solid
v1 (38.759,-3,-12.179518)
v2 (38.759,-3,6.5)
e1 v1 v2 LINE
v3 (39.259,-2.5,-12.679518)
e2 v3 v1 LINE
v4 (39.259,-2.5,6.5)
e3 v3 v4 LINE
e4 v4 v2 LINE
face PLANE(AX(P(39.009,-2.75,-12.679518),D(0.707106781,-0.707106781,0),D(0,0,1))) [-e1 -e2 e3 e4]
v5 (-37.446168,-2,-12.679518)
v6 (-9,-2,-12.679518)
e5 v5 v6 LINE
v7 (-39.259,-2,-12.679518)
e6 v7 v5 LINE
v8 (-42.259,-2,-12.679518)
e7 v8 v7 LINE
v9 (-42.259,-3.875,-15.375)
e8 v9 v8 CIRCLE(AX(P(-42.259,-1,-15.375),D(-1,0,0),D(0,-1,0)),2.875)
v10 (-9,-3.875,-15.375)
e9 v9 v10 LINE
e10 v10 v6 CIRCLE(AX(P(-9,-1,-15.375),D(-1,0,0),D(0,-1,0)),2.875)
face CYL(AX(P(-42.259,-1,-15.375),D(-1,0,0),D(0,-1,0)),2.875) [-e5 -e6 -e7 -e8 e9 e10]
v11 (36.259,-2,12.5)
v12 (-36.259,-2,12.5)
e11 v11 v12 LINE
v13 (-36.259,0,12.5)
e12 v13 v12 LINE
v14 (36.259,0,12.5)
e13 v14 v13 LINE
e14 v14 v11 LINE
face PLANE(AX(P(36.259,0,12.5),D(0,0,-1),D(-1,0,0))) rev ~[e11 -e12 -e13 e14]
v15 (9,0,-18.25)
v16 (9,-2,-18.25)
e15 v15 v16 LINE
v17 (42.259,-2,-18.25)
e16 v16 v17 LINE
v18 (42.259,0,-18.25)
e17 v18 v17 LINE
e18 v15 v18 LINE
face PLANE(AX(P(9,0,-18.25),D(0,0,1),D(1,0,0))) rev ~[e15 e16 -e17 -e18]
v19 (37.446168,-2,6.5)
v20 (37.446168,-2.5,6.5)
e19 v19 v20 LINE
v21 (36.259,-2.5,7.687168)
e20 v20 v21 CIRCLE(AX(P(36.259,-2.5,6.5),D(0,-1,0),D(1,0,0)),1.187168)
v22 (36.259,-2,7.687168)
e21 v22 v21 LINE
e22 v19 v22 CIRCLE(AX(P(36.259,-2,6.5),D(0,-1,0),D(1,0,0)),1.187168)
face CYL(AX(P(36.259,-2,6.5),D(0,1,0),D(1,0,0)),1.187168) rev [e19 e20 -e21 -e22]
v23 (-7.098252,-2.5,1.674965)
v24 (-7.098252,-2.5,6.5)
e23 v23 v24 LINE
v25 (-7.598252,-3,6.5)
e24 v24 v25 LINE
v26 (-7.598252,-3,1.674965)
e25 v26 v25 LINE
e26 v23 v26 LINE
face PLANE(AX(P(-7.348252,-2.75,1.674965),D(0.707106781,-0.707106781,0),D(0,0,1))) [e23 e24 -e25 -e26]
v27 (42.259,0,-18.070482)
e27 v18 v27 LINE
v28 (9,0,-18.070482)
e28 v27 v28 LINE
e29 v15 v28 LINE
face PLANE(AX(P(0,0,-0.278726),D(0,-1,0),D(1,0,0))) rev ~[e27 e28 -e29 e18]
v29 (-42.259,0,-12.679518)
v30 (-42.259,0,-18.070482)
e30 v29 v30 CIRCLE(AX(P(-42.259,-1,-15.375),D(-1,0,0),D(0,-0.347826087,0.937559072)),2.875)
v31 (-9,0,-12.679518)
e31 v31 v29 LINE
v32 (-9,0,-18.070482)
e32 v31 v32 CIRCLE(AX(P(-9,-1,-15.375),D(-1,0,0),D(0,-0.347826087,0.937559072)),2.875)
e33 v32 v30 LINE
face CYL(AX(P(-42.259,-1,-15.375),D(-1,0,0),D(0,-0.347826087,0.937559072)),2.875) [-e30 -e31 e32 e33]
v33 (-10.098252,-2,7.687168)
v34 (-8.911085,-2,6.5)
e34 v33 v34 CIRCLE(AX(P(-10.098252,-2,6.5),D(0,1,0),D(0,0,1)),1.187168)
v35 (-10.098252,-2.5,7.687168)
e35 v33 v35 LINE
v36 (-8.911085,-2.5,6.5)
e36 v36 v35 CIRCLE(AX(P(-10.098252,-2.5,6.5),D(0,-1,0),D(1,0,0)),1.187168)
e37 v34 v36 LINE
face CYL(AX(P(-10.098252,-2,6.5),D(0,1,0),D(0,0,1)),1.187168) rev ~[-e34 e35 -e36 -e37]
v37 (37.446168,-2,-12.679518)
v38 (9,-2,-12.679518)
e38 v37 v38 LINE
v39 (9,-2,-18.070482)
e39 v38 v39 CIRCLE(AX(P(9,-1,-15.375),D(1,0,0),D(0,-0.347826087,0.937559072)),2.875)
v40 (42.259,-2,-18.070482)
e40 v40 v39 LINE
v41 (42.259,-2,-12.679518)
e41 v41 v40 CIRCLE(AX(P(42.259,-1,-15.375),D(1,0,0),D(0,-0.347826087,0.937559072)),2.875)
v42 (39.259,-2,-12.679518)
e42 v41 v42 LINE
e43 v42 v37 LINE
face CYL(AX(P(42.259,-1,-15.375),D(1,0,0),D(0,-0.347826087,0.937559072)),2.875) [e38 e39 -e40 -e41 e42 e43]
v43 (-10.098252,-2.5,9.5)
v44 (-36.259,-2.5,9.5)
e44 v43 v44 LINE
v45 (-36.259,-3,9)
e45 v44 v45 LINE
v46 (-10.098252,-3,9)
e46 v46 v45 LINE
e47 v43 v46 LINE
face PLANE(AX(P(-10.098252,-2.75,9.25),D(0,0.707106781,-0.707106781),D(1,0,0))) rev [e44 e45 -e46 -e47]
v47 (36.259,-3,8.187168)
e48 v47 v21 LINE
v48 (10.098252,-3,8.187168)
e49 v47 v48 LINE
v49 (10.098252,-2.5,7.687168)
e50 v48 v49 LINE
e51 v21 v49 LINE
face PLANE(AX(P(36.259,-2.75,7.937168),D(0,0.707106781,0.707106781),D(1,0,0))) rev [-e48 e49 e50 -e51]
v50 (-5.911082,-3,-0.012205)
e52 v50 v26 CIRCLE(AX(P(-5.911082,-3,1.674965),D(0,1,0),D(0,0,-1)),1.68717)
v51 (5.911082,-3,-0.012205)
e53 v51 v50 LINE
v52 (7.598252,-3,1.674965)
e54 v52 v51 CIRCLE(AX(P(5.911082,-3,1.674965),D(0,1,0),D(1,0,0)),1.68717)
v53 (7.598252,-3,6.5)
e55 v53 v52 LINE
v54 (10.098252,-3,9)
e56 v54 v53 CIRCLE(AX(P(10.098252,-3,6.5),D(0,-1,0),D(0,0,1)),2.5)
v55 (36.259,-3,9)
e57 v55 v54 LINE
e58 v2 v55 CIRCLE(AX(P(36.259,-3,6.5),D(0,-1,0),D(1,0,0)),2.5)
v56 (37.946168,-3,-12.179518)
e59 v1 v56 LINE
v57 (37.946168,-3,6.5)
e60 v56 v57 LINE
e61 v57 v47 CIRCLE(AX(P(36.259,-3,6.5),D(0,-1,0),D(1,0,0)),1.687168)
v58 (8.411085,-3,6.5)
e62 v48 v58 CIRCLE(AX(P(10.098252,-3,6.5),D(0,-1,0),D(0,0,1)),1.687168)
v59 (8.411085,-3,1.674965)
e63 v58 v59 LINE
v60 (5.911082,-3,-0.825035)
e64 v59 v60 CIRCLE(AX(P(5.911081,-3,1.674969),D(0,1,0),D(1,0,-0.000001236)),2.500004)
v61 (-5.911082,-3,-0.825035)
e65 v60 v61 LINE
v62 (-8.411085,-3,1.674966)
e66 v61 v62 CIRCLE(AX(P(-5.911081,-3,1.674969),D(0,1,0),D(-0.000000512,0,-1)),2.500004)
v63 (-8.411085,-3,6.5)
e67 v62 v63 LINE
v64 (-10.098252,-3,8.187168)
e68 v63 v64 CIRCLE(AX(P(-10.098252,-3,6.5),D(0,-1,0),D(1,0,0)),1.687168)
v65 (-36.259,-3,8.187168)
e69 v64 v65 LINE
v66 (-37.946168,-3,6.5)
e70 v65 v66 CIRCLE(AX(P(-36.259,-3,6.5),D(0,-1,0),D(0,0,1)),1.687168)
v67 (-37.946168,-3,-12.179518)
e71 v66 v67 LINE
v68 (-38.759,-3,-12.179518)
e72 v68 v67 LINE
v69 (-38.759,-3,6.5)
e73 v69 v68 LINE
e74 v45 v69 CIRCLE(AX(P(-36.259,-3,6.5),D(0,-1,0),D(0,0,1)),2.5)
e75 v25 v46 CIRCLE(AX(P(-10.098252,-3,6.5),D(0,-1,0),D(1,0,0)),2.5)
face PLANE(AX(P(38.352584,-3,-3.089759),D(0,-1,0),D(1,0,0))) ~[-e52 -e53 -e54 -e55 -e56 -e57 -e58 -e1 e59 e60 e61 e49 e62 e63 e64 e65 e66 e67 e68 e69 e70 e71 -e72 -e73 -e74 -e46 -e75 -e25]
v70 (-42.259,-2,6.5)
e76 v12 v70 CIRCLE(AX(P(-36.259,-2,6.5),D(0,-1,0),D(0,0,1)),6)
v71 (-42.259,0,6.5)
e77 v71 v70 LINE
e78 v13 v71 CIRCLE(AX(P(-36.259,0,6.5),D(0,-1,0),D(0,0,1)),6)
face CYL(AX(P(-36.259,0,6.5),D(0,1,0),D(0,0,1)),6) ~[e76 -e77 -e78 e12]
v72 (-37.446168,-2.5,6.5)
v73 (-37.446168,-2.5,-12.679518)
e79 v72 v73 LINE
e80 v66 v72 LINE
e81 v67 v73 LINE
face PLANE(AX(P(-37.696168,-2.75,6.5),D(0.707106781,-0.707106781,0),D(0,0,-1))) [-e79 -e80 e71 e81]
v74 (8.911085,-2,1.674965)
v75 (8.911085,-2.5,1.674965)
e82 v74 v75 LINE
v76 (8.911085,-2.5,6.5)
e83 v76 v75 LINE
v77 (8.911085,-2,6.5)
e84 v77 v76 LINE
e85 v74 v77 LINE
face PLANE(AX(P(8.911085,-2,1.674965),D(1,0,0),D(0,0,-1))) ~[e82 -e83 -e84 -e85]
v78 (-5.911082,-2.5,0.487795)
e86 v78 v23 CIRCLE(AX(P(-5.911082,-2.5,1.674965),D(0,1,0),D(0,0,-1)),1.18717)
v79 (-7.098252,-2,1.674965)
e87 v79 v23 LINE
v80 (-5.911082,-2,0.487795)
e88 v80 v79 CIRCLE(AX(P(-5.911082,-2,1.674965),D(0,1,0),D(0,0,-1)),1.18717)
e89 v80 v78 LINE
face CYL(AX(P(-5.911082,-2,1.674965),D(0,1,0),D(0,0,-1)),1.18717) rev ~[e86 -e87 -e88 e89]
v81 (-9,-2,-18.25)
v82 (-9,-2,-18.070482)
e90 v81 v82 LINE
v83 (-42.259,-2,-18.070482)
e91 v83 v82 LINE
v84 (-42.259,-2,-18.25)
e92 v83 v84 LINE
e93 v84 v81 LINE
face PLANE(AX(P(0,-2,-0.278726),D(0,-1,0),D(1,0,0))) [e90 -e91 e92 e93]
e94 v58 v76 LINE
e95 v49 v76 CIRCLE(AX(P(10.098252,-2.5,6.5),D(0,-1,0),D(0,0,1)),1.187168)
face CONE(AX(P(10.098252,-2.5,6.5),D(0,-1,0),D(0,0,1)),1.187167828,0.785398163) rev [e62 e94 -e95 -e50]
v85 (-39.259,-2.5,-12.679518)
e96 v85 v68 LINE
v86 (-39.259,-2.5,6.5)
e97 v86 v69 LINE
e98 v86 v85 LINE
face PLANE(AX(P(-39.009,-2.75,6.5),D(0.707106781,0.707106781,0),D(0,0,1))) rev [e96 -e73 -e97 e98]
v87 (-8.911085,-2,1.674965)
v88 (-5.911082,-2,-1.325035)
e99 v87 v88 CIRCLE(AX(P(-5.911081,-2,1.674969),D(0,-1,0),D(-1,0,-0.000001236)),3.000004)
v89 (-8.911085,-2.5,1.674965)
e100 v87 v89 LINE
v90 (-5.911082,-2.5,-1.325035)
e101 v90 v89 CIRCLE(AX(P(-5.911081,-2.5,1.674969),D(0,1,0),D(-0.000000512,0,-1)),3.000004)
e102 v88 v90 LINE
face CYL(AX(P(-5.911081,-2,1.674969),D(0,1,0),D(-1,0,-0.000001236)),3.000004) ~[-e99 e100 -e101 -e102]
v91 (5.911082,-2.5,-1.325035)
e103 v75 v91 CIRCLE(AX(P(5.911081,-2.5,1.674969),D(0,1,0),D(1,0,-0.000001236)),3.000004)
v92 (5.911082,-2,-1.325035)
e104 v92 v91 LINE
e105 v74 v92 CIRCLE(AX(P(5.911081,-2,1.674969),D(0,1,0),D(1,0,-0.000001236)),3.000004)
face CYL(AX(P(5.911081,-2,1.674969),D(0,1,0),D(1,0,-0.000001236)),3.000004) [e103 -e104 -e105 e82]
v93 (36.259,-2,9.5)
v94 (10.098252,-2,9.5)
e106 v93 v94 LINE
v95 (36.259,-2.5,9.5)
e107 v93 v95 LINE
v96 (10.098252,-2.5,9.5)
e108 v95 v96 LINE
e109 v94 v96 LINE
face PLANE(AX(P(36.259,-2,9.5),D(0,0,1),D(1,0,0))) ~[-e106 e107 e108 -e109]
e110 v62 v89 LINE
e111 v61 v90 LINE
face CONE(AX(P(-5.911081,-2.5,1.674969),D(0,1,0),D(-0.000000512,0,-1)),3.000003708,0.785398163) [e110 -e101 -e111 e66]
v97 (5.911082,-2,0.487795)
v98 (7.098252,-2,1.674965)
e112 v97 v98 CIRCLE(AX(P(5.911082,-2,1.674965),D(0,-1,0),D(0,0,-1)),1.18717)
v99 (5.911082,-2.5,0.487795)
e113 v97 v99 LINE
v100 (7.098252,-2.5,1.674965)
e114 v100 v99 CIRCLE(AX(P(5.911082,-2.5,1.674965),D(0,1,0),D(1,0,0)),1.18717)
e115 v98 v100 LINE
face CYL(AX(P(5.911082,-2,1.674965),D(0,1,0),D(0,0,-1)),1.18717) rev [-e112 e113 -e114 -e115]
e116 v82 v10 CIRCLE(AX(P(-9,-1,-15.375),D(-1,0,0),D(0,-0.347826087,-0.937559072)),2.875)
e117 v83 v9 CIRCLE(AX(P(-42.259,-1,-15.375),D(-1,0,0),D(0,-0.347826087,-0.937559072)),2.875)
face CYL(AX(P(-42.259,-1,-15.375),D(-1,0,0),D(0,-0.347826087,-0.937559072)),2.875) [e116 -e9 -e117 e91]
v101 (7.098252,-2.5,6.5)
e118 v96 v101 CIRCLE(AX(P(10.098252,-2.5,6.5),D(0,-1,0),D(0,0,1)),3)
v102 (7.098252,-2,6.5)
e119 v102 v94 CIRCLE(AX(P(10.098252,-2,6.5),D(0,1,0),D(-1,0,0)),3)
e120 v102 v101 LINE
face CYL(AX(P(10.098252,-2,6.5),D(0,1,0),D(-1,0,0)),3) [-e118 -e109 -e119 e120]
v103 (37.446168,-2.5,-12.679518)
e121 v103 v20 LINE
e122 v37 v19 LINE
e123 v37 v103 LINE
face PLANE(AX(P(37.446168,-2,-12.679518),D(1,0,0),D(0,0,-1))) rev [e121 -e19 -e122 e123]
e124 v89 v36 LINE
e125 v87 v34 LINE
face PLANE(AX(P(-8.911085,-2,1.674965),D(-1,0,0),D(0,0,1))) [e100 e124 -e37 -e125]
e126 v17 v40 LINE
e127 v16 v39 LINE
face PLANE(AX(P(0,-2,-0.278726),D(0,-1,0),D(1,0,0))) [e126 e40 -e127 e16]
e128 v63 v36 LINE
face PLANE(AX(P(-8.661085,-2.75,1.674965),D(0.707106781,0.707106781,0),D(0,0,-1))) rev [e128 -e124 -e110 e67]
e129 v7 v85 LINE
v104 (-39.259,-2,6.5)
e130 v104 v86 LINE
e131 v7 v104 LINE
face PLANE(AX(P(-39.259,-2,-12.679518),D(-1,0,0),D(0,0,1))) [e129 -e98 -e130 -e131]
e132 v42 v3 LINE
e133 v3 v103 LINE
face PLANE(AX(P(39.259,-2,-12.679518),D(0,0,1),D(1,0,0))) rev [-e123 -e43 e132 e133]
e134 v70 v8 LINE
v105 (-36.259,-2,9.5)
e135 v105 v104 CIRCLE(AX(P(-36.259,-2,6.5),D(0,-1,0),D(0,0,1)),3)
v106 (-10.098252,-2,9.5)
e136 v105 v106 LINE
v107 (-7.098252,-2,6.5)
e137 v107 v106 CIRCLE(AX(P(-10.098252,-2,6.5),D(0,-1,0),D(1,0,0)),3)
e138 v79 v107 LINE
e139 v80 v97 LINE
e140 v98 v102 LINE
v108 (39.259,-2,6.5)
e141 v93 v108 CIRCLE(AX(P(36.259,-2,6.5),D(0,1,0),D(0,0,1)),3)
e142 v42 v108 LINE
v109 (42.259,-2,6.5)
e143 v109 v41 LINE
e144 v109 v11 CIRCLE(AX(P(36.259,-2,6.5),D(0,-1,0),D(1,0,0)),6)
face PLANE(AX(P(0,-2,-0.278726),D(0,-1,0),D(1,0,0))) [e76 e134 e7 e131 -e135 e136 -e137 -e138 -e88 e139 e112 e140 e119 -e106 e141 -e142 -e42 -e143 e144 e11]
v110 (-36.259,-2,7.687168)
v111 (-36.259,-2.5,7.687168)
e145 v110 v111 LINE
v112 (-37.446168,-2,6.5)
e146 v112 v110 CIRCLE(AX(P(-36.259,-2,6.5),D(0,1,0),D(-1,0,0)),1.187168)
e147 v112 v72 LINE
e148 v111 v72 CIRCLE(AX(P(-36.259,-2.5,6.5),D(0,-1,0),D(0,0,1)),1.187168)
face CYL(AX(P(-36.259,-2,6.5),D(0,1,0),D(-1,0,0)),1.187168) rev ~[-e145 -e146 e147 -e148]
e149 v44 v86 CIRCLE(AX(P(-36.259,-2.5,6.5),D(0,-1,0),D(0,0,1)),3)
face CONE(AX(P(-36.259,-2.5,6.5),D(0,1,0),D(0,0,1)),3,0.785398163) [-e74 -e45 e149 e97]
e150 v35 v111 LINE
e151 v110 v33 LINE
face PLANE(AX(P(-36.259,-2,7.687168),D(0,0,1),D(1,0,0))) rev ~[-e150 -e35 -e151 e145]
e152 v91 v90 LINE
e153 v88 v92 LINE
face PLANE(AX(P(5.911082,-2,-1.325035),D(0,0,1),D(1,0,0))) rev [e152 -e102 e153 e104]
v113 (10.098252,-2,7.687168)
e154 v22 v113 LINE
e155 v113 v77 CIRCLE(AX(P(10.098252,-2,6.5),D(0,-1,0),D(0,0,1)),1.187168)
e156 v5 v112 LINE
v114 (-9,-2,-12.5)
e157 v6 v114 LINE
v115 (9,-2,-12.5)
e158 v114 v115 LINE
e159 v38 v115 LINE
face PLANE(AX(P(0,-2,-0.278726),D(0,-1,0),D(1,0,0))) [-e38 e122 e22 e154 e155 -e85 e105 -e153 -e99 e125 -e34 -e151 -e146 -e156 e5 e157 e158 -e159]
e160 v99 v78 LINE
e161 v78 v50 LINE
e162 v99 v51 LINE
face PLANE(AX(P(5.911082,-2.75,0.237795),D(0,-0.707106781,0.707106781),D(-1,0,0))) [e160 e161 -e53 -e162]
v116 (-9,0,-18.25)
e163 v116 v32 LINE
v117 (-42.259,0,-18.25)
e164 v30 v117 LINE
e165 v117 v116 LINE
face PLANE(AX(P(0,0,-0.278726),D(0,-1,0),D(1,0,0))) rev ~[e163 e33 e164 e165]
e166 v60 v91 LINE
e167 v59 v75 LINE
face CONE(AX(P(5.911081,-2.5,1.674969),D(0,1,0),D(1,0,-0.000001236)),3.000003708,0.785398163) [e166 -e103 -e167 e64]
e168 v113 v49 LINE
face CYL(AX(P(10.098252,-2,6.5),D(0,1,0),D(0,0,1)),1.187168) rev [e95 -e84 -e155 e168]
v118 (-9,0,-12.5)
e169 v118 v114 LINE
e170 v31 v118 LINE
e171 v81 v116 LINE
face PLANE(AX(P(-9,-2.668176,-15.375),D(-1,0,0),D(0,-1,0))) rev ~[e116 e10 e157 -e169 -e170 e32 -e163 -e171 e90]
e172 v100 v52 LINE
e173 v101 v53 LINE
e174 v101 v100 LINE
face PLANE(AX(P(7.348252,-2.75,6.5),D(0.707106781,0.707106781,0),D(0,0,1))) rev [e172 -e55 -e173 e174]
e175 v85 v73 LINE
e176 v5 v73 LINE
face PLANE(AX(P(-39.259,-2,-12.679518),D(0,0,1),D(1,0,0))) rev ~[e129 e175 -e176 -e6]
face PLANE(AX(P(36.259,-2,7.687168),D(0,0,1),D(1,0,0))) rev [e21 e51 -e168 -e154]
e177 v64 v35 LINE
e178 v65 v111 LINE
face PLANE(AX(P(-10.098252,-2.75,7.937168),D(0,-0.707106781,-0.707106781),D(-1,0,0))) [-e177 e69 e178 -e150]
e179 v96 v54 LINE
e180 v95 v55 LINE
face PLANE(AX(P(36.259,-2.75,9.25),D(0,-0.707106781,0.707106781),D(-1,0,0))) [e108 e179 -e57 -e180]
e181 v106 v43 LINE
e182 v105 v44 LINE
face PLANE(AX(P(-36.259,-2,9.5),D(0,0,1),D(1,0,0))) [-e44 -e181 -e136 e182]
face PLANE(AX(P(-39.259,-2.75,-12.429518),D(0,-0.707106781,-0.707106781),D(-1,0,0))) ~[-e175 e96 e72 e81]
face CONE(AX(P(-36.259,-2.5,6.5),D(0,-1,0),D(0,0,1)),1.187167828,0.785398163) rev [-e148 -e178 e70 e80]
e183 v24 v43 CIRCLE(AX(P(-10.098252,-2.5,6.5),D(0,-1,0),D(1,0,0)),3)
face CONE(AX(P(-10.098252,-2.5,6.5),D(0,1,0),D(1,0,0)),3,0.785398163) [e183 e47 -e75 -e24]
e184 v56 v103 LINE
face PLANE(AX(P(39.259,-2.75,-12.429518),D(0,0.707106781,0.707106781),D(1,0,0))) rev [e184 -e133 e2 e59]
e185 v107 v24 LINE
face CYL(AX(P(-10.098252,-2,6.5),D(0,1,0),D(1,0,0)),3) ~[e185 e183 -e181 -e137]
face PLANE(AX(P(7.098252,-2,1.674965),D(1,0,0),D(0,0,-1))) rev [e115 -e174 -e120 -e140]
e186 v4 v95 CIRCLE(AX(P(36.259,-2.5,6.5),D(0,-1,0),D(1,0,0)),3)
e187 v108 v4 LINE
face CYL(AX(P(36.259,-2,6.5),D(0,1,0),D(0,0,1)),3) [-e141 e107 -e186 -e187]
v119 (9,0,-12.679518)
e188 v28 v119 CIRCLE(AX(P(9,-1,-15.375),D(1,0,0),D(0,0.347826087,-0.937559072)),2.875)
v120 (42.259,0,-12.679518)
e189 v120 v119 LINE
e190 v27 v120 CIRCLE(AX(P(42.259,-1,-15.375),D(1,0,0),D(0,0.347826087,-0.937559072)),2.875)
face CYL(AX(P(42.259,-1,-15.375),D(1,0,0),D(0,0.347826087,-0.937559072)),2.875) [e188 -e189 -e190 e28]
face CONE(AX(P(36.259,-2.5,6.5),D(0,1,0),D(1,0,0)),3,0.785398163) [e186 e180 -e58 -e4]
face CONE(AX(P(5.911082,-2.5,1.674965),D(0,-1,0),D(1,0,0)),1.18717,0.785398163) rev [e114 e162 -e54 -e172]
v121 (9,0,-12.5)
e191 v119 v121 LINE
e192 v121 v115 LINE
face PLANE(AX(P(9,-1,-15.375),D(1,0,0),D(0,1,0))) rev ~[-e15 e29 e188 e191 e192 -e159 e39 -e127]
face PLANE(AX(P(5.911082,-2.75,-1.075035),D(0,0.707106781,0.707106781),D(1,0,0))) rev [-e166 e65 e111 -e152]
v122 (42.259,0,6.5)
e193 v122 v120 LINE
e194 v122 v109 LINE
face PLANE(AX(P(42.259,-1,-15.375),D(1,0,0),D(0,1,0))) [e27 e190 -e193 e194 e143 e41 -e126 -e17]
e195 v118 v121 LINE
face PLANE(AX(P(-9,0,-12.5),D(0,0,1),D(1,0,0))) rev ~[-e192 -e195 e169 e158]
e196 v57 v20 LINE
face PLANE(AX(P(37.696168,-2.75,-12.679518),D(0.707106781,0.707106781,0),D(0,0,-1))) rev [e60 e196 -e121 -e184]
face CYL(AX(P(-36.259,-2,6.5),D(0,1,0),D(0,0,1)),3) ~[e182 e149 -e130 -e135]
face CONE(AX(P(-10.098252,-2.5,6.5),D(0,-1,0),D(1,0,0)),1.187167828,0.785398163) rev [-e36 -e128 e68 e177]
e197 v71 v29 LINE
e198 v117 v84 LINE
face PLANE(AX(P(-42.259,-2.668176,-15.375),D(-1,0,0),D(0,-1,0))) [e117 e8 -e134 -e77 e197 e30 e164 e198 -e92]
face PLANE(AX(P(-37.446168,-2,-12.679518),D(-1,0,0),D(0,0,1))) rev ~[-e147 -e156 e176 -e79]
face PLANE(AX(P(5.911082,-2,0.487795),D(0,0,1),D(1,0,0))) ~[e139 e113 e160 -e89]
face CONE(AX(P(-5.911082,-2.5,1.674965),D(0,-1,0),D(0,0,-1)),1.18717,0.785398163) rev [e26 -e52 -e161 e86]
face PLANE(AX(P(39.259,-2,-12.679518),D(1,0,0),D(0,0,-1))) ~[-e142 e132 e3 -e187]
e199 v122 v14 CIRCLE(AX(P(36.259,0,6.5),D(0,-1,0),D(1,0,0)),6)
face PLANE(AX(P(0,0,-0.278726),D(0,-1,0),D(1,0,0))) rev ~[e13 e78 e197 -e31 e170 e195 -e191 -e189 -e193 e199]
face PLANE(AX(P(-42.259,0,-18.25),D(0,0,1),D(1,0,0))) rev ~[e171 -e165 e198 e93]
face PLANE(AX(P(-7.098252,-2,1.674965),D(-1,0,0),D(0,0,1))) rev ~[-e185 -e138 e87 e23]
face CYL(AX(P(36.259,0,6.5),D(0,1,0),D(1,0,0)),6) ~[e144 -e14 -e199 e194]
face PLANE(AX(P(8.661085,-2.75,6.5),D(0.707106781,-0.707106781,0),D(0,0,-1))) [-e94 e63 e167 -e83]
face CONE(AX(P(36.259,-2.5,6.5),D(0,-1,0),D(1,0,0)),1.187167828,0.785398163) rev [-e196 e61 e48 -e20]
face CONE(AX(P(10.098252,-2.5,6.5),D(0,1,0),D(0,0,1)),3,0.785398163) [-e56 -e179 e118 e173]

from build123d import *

# Parameters (mm, degrees)
F0_W     = 33.259
F0_H     = 5.75
F1_DEPTH = 2
F3_DEPTH = 33.259
F6_DEPTH = 33.259
F4_W     = 1.8128321722
F4_H     = 19.1795176684
F4_W_2   = 26.160747505
F4_H_2   = 1.8128321722
F4_H_3   = 4.8250346239
F4_W_3   = 5.911082495
F4_H_4   = 1.81283
F7_DEPTH = 1
F8_SIZE  = 0.5


# Not quite as in the source:
# - ends of sketch curves that miss each other by under 0.0002 mm in the source are joined
# - a pattern or mirror of a feature is missing from the dataset's text; its kind, count and spacing are read off the source's solid


with BuildPart() as f1:
    # F0 (on Front) → F1 (new body)
    with BuildSketch(Plane.XZ):
        with BuildLine():
            Line((36.259, 12.5), (-36.259, 12.5))
            ThreePointArc((-36.259, 12.5), (-40.5016406871, 10.7426406871), (-42.259, 6.5))
            Line((-42.259, 6.5), (-42.259, -12.5))
            Line((-42.259, -12.5), (-9, -12.5))
            Line((-9, -12.5), (-3.6677482234, -11.0712274426))
            Line((-3.6677482234, -11.0712274426), (3.6677482234, -11.0712274426))
            Line((3.6677482234, -11.0712274426), (9, -12.5))
            Line((9, -12.5), (42.259, -12.5))
            Line((42.259, -12.5), (42.259, 6.5))
            ThreePointArc((42.259, 6.5), (40.5016406871, 10.7426406871), (36.259, 12.5))
        make_face()
        with Locations((-25.6295, -15.375)):
            Rectangle(F0_W, F0_H)
        with Locations((25.6295, -15.375)):
            Rectangle(F0_W, F0_H)
        Polygon((-3.6677482234, -11.0712274426), (-9, -12.5), (9, -12.5), (3.6677482234, -11.0712274426), align=None)
    extrude(amount=F1_DEPTH)

    # F2 (on face) → F3 (join, through all)
    with BuildSketch(Plane(origin=(-42.259, 0, 0), x_dir=(0, -1, 0), z_dir=(-1, 0, 0))):
        with BuildLine():
            ThreePointArc((3.875, -15.375), (3.3601509486, -13.7332593079), (2, -12.6795176684))
            Line((2, -12.6795176684), (2, -18.0704823316))
            ThreePointArc((2, -18.0704823316), (3.3601509486, -17.0167406921), (3.875, -15.375))
        make_face()
        with BuildLine():
            Line((2, -18.0704823316), (2, -12.6795176684))
            ThreePointArc((2, -12.6795176684), (-1.875, -15.375), (2, -18.0704823316))
        make_face()
    extrude(amount=-F3_DEPTH)

    # F5 (on face) → F6 (join, through all)
    with BuildSketch(Plane.YZ.offset(42.259)):
        with BuildLine():
            ThreePointArc((0, -18.0704823316), (1.875, -15.375), (0, -12.6795176684))
            Line((0, -12.6795176684), (0, -12.5))
            Line((0, -12.5), (-2, -12.5))
            Line((-2, -12.5), (-2, -12.6795176684))
            ThreePointArc((-2, -12.6795176684), (-3.875, -15.375), (-2, -18.0704823316))
            Line((-2, -18.0704823316), (-2, -18.25))
            Line((-2, -18.25), (0, -18.25))
            Line((0, -18.25), (0, -18.0704823316))
        make_face()
    extrude(amount=-F6_DEPTH)

    # F4 (on face) → F7 (join)
    with BuildSketch(Plane.XZ.offset(2)):
        with Locations((-38.3525839139, -3.0897588342)):
            Rectangle(F4_W, F4_H)
        with BuildLine():
            ThreePointArc((-36.259, 9.5), (-38.3803203436, 8.6213203436), (-39.259, 6.5))
            Line((-39.259, 6.5), (-37.4461678278, 6.5))
            ThreePointArc((-37.4461678278, 6.5), (-37.0984544214, 7.3394544214), (-36.259, 7.6871678278))
            Line((-36.259, 7.6871678278), (-36.259, 9.5))
        make_face()
        with Locations((-23.1786262475, 8.5935839139)):
            Rectangle(F4_W_2, F4_H_2)
        with BuildLine():
            ThreePointArc((-7.098252495, 6.5), (-7.9769321514, 8.6213203436), (-10.098252495, 9.5))
            Line((-10.098252495, 9.5), (-10.098252495, 7.6871678278))
            ThreePointArc((-10.098252495, 7.6871678278), (-9.2587980736, 7.3394544214), (-8.9110846672, 6.5))
            Line((-8.9110846672, 6.5), (-7.098252495, 6.5))
        make_face()
        with Locations((-8.0046685811, 4.087482688)):
            Rectangle(F4_W, F4_H_3)
        with Locations((-2.9555412475, -0.4186196239)):
            Rectangle(F4_W_3, F4_H_4)
        with BuildLine():
            ThreePointArc((-5.911082495, 0.4877953761), (-6.7505384524, 0.8355094187), (-7.098252495, 1.6749653761))
            Line((-7.098252495, 1.6749653761), (-8.9110846672, 1.6749653761))
            ThreePointArc((-8.9110846672, 1.6749653761), (-8.0324028386, -0.4463549675), (-5.911082495, -1.3250346239))
            Line((-5.911082495, -1.3250346239), (-5.911082495, 0.4877953761))
        make_face()
    f7 = extrude(amount=F7_DEPTH)

    # F7_copies: F7 across plane
    add(f7.mirror(Plane(origin=(0, 0, 0), x_dir=(0, 0, 1), z_dir=(1, 0, 0))))

    # F8
    f8_edges = [f1.edges().sort_by_distance(p)[0] for p in [
        (39.259, -3, -3.089759),
        (38.352584, -3, -12.679518),
        (37.446168, -3, -3.089759),
        (37.098454, -3, 7.339454),
        (23.178626, -3, 7.687168),
        (9.258798, -3, 7.339454),
        (8.911085, -3, 4.087483),
        (8.032403, -3, -0.446355),
        (0, -3, -1.325035),
        (-8.032403, -3, -0.446355),
        (-8.911085, -3, 4.087483),
        (-9.258798, -3, 7.339454),
        (-23.178626, -3, 7.687168),
        (-37.098454, -3, 7.339454),
        (-37.446168, -3, -3.089759),
        (-38.352584, -3, -12.679518),
        (-39.259, -3, -3.089759),
        (-38.38032, -3, 8.62132),
        (-23.178626, -3, 9.5),
        (-7.976932, -3, 8.62132),
        (-7.098252, -3, 4.087483),
        (-6.750538, -3, 0.835509),
        (0, -3, 0.487795),
        (6.750538, -3, 0.835509),
        (7.098252, -3, 4.087483),
        (7.976932, -3, 8.62132),
        (23.178626, -3, 9.5),
        (38.38032, -3, 8.62132),
    ]]
    chamfer(f8_edges, length=F8_SIZE)


solid = f1.part
